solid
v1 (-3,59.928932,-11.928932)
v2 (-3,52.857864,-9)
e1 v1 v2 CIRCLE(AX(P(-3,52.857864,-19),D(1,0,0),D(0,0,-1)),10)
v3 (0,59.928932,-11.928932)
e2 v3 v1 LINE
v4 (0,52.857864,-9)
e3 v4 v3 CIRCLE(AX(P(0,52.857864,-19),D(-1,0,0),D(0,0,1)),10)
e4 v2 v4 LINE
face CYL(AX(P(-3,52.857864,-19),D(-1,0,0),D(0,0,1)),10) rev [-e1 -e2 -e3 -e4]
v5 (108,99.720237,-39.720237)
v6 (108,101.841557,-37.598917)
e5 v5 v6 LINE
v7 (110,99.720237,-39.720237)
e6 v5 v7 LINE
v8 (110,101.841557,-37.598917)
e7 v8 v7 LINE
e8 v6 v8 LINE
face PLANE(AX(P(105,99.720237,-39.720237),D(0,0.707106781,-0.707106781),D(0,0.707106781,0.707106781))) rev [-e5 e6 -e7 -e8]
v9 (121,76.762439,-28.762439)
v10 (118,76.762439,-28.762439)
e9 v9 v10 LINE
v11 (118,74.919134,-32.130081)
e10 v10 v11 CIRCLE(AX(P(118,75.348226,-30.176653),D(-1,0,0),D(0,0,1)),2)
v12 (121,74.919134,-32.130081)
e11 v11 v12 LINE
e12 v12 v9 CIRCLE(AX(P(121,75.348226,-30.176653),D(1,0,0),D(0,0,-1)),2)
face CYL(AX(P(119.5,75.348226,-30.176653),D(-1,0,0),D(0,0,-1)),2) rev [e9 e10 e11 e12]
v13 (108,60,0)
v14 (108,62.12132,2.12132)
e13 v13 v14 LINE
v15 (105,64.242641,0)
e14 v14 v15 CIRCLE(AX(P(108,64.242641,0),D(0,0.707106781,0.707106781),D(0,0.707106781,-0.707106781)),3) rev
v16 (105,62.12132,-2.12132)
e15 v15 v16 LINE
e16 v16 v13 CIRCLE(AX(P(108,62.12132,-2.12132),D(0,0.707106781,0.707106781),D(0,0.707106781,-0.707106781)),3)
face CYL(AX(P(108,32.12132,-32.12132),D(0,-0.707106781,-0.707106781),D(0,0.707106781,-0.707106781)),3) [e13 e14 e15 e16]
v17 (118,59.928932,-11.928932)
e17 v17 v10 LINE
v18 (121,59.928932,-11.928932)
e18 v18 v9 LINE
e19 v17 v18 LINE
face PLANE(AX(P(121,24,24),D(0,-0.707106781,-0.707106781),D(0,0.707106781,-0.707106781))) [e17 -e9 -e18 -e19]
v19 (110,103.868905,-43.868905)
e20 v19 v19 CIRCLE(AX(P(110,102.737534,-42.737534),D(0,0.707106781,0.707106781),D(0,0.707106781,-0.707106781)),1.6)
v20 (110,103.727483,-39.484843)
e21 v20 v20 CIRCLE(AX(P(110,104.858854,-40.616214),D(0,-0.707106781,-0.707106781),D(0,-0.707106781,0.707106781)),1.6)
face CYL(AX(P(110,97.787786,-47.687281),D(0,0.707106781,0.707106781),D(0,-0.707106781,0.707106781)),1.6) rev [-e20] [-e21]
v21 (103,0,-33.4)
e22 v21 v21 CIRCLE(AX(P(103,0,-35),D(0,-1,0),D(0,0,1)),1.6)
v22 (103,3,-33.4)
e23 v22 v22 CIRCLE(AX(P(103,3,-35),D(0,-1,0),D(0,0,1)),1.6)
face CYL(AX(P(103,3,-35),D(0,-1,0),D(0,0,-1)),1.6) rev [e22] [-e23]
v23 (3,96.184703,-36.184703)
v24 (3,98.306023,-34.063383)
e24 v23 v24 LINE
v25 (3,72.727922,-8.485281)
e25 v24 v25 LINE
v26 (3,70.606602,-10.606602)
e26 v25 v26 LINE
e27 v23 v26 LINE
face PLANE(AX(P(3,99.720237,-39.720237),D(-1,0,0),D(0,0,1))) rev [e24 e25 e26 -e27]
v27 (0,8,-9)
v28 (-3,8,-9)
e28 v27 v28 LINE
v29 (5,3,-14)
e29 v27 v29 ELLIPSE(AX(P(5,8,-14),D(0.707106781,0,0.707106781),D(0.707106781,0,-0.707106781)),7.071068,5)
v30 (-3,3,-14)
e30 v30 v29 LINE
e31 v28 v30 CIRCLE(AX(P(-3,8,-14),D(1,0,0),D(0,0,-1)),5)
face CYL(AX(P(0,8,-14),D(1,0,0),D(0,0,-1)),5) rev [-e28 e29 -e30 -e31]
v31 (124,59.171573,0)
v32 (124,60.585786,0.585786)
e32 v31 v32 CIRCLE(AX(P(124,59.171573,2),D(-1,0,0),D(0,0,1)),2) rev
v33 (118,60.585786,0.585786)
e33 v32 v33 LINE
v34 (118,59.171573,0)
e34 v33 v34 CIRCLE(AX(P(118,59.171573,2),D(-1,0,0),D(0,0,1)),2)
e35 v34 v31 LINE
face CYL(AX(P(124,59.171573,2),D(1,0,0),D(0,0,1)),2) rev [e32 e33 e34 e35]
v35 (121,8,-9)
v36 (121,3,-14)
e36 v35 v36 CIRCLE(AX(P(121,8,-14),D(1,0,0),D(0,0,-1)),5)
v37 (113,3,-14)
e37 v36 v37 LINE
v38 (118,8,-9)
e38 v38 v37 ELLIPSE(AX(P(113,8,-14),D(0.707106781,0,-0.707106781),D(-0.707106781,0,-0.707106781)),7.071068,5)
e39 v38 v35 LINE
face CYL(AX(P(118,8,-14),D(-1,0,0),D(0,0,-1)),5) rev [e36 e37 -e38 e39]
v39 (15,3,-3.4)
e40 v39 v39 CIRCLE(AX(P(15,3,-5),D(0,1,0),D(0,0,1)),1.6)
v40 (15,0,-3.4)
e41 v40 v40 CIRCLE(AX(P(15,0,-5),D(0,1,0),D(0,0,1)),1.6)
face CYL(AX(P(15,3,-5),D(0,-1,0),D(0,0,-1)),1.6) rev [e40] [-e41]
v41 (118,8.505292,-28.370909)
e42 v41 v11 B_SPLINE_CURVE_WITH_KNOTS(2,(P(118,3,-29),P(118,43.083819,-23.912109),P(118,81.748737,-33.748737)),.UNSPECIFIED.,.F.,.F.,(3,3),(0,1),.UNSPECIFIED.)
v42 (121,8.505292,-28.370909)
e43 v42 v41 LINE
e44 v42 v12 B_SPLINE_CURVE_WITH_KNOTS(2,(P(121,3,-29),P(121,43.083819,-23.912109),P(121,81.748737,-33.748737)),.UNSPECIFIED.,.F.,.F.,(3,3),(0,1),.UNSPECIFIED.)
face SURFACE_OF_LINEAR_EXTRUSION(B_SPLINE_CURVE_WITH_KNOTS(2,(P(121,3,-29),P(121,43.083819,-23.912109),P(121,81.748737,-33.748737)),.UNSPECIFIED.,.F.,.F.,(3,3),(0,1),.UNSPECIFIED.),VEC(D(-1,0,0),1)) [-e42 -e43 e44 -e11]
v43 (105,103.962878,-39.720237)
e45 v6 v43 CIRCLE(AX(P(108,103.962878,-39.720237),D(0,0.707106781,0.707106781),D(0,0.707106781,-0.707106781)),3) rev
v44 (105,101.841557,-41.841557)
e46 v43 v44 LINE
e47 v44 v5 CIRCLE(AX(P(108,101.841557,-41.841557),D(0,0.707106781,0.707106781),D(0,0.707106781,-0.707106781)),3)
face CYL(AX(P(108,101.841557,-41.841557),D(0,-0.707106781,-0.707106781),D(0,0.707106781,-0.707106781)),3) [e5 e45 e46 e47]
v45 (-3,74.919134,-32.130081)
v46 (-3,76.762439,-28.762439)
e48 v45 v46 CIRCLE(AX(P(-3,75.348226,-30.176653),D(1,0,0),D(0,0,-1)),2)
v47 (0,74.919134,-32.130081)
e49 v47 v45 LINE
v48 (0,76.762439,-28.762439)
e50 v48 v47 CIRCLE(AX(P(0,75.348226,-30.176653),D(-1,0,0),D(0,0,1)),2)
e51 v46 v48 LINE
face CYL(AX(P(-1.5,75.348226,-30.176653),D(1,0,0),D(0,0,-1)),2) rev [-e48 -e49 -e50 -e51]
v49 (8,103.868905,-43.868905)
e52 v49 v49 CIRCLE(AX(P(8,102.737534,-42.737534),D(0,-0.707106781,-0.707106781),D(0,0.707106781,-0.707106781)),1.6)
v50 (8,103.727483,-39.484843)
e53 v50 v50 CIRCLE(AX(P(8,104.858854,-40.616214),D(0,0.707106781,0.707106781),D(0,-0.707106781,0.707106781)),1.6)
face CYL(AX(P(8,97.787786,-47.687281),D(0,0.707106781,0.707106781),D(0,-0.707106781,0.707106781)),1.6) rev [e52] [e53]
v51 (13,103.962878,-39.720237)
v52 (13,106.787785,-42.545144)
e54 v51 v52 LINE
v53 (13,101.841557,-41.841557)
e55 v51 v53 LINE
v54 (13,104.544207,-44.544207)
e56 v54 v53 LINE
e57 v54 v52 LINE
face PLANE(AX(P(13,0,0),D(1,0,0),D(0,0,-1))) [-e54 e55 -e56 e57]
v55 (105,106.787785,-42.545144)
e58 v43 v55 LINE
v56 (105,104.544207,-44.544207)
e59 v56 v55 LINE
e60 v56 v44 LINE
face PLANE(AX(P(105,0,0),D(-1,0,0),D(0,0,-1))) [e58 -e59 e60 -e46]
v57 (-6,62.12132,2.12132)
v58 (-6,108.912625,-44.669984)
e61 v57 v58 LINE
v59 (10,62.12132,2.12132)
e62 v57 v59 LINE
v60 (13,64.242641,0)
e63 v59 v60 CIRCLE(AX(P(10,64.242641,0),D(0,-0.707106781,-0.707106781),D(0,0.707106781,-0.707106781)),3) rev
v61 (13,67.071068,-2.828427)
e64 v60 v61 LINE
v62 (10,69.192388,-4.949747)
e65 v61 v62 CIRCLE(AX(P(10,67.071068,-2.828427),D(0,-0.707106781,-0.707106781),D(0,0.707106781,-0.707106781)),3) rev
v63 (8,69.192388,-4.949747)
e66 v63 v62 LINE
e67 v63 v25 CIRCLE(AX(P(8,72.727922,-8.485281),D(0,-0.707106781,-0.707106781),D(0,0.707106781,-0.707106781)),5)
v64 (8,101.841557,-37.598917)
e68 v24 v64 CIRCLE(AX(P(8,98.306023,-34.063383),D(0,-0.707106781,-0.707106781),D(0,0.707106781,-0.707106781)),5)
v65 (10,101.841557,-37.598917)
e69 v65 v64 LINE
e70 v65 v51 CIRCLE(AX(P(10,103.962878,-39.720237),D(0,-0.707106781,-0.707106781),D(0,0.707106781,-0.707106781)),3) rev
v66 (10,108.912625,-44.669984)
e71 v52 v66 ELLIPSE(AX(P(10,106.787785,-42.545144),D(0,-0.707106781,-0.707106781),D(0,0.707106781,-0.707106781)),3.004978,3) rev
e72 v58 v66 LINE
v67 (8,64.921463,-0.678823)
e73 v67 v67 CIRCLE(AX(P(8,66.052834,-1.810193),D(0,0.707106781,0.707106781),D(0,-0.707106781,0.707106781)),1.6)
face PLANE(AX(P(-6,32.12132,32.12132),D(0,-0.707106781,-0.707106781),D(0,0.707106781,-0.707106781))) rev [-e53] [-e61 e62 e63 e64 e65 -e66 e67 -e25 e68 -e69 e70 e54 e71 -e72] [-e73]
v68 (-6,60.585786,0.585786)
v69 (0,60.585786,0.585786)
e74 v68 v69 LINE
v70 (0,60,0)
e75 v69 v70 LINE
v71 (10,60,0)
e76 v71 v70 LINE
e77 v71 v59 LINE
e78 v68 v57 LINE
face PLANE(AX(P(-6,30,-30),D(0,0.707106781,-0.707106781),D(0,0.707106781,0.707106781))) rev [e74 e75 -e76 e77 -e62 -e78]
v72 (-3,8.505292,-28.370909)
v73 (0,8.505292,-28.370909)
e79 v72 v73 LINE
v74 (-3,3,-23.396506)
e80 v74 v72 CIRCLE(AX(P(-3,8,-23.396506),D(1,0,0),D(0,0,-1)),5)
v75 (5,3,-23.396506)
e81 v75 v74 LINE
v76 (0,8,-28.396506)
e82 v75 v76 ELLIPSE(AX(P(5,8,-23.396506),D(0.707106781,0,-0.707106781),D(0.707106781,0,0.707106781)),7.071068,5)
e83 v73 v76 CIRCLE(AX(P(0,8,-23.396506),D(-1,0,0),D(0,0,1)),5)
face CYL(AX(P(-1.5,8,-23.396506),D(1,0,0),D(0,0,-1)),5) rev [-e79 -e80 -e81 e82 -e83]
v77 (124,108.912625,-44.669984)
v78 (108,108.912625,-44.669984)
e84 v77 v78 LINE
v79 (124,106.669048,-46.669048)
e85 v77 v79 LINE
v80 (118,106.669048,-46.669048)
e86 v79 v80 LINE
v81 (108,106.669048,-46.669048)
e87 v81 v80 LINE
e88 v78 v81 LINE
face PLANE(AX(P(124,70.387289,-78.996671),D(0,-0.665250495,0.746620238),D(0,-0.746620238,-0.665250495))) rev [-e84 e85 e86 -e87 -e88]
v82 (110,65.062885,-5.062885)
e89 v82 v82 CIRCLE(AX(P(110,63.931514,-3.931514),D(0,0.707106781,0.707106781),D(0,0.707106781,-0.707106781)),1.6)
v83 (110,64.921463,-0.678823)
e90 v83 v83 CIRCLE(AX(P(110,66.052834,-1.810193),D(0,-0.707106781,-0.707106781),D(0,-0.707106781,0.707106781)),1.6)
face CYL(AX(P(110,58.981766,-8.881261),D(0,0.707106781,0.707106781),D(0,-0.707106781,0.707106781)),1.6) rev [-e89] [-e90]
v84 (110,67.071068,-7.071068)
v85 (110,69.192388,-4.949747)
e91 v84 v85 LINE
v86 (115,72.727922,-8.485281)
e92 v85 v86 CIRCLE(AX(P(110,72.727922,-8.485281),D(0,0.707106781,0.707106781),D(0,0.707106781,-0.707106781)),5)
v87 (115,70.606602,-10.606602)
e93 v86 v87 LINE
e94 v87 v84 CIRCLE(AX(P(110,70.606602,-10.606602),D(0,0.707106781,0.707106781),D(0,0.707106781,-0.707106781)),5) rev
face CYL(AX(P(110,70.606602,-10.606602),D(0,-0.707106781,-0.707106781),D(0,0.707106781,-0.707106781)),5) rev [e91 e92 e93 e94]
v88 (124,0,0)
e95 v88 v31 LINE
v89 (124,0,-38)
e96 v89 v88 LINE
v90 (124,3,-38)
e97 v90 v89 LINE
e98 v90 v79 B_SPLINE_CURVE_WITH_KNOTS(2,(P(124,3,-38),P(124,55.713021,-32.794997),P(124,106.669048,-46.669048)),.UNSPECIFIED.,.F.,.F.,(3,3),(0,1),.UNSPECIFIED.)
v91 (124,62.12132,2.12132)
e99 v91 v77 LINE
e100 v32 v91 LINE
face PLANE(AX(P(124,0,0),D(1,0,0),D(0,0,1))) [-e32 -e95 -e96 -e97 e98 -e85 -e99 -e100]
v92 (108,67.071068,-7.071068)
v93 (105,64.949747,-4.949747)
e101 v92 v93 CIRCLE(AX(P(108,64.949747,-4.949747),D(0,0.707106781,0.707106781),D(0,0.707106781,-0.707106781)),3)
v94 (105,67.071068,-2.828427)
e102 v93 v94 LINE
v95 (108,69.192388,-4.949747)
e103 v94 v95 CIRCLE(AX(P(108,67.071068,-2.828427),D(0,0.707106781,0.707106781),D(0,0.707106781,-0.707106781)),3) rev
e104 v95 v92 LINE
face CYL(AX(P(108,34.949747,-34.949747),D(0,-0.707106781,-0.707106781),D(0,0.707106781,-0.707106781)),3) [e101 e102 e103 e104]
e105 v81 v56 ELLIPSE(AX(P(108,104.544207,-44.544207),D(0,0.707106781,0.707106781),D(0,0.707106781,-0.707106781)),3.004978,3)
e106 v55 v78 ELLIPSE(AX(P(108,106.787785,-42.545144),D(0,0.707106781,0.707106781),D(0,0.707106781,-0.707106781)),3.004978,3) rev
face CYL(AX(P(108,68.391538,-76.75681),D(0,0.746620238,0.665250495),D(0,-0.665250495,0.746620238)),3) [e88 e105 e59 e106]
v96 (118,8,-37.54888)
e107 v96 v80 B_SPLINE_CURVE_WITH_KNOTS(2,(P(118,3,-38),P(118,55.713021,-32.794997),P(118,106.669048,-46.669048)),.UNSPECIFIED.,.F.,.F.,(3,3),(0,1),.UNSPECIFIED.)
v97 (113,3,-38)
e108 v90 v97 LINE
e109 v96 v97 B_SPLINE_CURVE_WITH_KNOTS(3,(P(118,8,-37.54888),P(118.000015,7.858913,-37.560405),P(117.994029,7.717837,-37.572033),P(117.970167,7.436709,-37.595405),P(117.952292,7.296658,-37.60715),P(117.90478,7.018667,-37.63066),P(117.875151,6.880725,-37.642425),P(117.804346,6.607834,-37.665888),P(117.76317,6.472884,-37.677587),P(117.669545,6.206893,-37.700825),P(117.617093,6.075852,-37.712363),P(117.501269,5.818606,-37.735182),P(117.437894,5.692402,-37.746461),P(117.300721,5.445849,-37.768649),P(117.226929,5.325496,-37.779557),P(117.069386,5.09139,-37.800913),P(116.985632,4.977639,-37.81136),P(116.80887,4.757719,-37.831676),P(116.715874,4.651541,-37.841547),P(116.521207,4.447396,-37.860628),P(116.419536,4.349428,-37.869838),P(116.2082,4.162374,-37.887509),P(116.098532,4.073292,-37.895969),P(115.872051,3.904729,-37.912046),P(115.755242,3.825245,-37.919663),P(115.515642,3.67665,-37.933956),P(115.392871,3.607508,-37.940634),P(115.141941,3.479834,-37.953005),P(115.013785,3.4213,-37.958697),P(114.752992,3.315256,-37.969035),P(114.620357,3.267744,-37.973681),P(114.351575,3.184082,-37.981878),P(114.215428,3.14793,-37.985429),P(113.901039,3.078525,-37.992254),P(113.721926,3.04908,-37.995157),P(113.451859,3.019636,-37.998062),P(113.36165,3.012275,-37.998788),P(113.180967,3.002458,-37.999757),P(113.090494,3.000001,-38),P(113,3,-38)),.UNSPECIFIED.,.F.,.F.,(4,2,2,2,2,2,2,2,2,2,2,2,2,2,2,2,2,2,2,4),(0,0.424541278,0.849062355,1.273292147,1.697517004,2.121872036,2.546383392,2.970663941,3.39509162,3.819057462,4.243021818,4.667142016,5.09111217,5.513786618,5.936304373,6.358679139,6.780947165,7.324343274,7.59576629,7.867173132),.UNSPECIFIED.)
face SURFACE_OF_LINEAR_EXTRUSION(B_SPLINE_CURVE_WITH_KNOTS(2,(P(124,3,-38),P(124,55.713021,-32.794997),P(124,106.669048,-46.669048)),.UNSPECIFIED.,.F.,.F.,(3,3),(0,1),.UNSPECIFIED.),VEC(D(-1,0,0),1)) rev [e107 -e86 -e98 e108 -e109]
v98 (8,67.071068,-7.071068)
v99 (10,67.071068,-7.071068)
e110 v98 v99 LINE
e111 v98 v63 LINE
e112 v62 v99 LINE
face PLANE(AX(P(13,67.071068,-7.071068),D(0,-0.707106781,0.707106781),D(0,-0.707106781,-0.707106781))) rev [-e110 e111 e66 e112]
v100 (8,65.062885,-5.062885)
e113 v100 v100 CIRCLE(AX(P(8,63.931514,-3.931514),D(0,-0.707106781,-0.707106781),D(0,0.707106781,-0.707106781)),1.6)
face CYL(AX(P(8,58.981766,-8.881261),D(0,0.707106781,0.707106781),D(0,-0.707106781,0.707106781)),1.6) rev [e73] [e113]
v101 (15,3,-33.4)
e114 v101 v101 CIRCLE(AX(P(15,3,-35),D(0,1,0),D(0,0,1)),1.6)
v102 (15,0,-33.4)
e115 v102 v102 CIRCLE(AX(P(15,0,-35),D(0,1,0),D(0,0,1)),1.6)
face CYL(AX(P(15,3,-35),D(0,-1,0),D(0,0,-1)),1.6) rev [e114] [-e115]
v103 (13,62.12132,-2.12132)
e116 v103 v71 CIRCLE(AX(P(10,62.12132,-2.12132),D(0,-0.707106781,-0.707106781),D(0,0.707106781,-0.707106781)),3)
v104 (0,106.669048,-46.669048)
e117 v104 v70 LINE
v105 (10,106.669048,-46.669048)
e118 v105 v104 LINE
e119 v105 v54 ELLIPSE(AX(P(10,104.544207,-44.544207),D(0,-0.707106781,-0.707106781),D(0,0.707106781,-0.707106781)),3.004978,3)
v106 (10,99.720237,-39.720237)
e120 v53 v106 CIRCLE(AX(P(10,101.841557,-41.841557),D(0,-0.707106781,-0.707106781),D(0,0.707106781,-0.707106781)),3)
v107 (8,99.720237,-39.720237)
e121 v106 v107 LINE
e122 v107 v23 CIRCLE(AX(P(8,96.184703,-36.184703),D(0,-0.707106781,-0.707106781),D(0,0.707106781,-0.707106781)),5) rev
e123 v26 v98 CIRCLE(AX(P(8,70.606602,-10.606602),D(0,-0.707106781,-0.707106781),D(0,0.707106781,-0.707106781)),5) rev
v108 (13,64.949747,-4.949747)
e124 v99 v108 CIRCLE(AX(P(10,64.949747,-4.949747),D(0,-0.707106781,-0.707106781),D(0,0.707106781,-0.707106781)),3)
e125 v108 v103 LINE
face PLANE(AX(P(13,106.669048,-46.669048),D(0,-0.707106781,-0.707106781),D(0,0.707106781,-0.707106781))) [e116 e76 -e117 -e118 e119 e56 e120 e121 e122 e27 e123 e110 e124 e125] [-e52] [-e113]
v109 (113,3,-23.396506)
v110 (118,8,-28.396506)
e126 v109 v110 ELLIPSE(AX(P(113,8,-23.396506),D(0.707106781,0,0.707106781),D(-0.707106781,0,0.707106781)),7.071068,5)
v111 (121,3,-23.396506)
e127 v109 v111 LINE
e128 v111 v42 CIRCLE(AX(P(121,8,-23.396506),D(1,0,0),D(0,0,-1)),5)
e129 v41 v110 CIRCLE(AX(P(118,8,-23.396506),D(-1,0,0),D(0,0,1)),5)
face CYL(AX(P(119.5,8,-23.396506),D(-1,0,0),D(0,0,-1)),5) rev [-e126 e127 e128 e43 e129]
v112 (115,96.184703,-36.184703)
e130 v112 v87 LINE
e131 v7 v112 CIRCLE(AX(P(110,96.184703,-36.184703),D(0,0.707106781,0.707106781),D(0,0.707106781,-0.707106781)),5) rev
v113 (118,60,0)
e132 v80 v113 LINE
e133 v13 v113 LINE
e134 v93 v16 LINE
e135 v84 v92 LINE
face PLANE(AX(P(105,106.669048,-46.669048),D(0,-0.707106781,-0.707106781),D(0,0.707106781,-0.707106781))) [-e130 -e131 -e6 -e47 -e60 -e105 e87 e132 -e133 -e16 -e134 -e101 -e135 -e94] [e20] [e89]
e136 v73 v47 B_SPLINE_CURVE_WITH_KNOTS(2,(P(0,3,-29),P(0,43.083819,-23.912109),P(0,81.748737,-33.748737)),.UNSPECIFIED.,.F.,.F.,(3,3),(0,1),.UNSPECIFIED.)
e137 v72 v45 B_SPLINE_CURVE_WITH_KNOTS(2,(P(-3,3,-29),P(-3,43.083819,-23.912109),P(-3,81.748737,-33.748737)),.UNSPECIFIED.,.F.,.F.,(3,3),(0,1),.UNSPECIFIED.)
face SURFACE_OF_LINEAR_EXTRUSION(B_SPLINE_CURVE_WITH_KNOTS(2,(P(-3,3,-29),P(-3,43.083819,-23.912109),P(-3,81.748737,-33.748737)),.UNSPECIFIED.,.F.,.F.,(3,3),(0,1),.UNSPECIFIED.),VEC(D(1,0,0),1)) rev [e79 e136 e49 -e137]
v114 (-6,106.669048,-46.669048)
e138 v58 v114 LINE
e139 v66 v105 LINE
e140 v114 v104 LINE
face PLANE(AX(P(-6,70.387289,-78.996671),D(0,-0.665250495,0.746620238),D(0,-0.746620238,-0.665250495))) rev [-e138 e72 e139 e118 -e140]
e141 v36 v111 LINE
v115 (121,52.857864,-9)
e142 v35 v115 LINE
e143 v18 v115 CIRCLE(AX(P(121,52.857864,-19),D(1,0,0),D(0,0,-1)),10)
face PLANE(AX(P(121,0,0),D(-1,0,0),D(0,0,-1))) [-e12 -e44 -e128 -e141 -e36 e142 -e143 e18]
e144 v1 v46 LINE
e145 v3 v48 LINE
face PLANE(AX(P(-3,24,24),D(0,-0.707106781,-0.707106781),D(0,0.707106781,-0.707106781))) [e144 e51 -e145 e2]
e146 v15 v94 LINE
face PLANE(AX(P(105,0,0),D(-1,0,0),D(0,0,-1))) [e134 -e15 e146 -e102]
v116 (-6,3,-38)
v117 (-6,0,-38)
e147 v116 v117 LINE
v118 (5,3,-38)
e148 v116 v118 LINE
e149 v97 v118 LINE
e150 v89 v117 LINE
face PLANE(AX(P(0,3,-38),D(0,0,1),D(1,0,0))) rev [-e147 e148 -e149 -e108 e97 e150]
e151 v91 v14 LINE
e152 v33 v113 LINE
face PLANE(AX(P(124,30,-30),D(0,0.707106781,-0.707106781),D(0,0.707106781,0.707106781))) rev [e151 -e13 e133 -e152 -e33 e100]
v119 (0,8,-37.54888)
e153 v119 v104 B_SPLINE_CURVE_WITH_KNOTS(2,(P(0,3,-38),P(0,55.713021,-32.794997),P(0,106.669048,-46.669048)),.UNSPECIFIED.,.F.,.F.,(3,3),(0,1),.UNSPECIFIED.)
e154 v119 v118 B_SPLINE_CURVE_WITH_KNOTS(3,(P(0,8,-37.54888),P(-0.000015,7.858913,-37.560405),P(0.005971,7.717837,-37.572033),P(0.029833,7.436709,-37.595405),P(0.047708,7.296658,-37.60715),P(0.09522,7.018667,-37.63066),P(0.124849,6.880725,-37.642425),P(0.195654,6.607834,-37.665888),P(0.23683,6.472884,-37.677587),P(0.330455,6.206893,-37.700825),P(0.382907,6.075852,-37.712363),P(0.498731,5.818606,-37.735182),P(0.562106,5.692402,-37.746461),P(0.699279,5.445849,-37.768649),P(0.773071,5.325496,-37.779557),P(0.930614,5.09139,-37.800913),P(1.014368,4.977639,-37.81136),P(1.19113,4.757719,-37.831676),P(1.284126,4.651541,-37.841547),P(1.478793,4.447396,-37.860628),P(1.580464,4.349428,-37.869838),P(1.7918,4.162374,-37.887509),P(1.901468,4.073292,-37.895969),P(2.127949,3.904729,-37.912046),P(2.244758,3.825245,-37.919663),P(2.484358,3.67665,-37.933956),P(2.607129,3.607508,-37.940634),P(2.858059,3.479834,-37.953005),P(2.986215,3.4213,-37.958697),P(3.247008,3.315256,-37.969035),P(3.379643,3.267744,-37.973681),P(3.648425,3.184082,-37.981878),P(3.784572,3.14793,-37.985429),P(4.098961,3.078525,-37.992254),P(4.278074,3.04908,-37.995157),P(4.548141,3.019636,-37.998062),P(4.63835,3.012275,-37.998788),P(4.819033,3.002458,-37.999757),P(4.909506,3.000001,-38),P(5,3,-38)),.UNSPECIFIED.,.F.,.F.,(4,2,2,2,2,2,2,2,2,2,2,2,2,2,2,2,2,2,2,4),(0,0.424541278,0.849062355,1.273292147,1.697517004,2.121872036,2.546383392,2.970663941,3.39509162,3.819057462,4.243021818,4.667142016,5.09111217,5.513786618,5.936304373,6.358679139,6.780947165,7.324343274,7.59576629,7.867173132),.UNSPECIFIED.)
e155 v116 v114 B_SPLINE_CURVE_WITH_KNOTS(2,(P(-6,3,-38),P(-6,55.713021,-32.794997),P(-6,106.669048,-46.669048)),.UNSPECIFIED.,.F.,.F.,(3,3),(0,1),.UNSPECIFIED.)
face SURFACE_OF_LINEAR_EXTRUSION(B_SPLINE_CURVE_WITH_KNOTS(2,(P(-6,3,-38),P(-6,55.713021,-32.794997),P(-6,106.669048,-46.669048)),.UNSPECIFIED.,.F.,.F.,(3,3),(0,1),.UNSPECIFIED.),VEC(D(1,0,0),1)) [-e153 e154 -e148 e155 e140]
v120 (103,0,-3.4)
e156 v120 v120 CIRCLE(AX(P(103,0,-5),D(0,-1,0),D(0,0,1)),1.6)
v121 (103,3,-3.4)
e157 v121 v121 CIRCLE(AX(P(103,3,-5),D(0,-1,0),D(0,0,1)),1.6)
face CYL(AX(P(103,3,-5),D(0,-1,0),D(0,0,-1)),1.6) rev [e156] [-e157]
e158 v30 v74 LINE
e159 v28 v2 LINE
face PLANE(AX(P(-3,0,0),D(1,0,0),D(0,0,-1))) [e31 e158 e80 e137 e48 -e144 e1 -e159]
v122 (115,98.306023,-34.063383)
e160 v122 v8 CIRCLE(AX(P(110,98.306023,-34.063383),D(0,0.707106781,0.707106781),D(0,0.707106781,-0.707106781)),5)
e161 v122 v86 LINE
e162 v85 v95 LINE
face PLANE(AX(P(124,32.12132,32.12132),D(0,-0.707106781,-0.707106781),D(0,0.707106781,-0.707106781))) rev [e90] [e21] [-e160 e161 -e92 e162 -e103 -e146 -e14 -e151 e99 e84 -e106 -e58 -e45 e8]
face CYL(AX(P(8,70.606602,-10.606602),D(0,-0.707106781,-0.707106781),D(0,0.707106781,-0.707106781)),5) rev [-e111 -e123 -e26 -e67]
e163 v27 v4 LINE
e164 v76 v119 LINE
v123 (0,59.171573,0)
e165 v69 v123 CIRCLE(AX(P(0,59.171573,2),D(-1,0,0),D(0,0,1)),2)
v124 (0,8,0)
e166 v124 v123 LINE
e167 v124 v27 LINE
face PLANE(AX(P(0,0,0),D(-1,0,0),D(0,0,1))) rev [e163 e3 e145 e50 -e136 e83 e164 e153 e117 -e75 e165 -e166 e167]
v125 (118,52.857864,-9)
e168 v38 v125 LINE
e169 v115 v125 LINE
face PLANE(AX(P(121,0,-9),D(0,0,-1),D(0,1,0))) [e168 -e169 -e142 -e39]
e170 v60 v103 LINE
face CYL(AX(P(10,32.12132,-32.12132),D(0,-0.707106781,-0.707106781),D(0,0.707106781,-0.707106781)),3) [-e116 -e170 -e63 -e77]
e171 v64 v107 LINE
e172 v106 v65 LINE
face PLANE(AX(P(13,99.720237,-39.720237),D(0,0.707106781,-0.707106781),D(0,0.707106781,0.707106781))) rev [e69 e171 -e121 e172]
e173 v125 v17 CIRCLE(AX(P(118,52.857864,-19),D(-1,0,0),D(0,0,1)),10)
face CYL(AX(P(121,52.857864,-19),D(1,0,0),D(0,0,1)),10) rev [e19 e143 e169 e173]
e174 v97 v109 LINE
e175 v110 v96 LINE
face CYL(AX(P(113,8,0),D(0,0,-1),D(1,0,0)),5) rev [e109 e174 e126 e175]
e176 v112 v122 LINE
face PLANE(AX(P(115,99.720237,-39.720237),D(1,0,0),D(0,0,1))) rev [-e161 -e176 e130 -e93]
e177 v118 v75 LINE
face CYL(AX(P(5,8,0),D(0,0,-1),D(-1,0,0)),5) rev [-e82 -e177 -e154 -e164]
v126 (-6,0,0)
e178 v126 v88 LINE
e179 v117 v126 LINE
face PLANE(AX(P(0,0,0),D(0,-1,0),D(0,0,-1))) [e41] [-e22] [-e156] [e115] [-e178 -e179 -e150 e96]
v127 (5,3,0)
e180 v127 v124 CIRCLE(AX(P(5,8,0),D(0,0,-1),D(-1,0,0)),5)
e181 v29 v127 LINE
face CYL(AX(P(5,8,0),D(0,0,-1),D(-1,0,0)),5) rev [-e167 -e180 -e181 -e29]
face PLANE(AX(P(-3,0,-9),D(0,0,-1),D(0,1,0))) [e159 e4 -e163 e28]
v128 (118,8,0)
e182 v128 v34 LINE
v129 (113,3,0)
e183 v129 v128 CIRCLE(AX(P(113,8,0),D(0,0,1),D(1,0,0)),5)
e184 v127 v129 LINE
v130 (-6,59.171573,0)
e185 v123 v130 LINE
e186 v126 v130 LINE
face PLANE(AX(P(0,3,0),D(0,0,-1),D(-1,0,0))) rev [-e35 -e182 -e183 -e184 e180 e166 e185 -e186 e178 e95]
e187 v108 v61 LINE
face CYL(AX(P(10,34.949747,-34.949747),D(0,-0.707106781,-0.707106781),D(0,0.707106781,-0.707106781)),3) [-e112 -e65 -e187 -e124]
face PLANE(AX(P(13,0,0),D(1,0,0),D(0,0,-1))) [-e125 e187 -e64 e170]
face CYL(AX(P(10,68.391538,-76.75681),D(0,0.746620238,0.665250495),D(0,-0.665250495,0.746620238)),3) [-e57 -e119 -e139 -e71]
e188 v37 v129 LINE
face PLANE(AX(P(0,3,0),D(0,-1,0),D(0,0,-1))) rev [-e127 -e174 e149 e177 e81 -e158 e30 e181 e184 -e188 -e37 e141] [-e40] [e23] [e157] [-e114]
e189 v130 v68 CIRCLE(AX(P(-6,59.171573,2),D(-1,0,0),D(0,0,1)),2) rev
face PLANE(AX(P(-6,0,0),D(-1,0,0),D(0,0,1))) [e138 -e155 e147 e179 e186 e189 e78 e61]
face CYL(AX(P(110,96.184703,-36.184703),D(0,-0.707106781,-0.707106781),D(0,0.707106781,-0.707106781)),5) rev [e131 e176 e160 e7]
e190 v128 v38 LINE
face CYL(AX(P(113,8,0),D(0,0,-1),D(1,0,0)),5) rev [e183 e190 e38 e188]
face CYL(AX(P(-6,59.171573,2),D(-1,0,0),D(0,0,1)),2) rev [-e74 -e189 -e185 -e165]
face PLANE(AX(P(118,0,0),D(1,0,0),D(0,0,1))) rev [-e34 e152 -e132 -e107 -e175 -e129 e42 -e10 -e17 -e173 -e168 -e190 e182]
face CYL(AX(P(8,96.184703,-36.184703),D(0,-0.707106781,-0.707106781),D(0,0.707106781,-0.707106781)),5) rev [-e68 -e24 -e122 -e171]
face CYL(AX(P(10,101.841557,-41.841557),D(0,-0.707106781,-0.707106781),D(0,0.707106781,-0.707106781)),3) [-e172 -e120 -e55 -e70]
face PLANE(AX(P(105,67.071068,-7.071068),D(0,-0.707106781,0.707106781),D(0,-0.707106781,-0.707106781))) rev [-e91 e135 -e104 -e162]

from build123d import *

# Parameters (mm, degrees)
SKETCH_1_W          = 20
SKETCH_1_H          = 38
SKETCH_1_R          = 1.6
EXTRUDE_1_DEPTH     = 3
SKETCH_7_W          = 38
SKETCH_7_H          = 3
EXTRUDE_7_DEPTH     = 6
EXTRUDE_8_DEPTH     = 19
FILLET_1_R          = 2
SKETCH_10_R         = 1.6
CUT_EXTRUDE_3_DEPTH = 10
CUT_EXTRUDE_4_DEPTH = 3
SKETCH_13_W         = 10
SKETCH_13_H         = 46.172897719
CUT_EXTRUDE_5_DEPTH = 3
FILLET_3_R          = 10
FILLET_4_R          = 5
FILLET_5_R          = 2
FILLET_6_R          = 5
FILLET_7_R          = 5
FILLET_8_R          = 3
SKETCH_11_W         = 39
SKETCH_11_H         = 38
EXTRUDE_9_DEPTH     = 3
FILLET_START        = -37.531780157
FILLET_9_DEPTH      = 9.135274029
FILLET_START_2      = -9
FILLET_9_2_DEPTH    = 9
FILLET_START_3      = -38.0000001
FILLET_9_3_DEPTH    = 14.603493972
FILLET_START_4      = -14
FILLET_9_4_DEPTH    = 5
FILLET_9_5_DEPTH    = 5


with BuildPart() as part:
    # 草图1 → 凸台-拉伸1 (new body)
    with BuildSketch(Plane(origin=(0, 0, 0), x_dir=(1, 0, 0), z_dir=(0, 1, 0))):
        with Locations((10, 19)):
            Rectangle(SKETCH_1_W, SKETCH_1_H)
        with Locations(Location((15, 5, 0), (0, 0, 270))):
            Circle(SKETCH_1_R, mode=Mode.SUBTRACT)
        with Locations(Location((15, 35, 0), (0, 0, 270))):
            Circle(SKETCH_1_R, mode=Mode.SUBTRACT)
    extrude(amount=EXTRUDE_1_DEPTH)

    # 草图7 → 凸台-拉伸7 (add)
    with BuildSketch(Plane.ZY):
        with BuildLine():
            Line((-38, 3), (0, 3))
            Line((0, 3), (0, 60))
            Line((0, 60), (-38, 60))
            add(Edge.make_bspline(
                [(-38, 3), (-35.160021148, 31.761534368), (-38, 60)],
                knots=[0, 0, 0, 0.545624852, 0.545624852, 0.545624852], degree=2))
        make_face()
        with Locations((-19, 1.5)):
            Rectangle(SKETCH_7_W, SKETCH_7_H)
        with BuildLine():
            Line((-38, 60), (0, 60))
            Line((0, 60), (2.121320344, 62.121320344))
            Line((2.121320344, 62.121320344), (-44.669984364, 108.912625051))
            Line((-44.669984364, 108.912625051), (-46.669047558, 106.669047558))
            add(Edge.make_bspline(
                [(-38, 60), (-40.365023894, 83.51589552), (-46.669047558, 106.669047558)],
                knots=[0.545624852, 0.545624852, 0.545624852, 1, 1, 1], degree=2))
        make_face()
    extrude(amount=EXTRUDE_7_DEPTH)

    # 草图8 → 凸台-拉伸8 (add)
    with BuildSketch(Plane.ZY.offset(6)):
        Polygon((-44.669984364, 108.912625051), (-46.669047558, 106.669047558), (0, 60), (2.121320344, 62.121320344), align=None)
    extrude(amount=-EXTRUDE_8_DEPTH)

    # 圆角1
    fillet_1_edges = [part.edges().sort_by_distance(p)[0] for p in [
        (-3, 60, 0),
    ]]
    fillet(fillet_1_edges, radius=FILLET_1_R)

    # 草图10 → 切除-拉伸3 (cut)
    with BuildSketch(Plane(origin=(0, 32.121320344, 32.121320344), x_dir=(1, 0, 0), z_dir=(0, 0.7071067811865476, 0.7071067811865475))):
        with Locations(Location((8, 102.866406871, 0), (0, 0, 270))):
            Circle(SKETCH_10_R)
        with Locations(Location((8, 47.986406871, 0), (0, 0, 270))):
            Circle(SKETCH_10_R)
    extrude(amount=-CUT_EXTRUDE_3_DEPTH, mode=Mode.SUBTRACT)

    # 草图12 → 切除-拉伸4 (cut)
    with BuildSketch(Plane(origin=(0, 0, 0), x_dir=(0, 0, -1), z_dir=(1, 0, 0))):
        with BuildLine():
            Line((9, 57), (9, 3))
            Line((9, 3), (29, 3))
            add(Edge.make_bspline(
                [(29, 3), (25.530992691, 30.329804849), (29, 57)],
                knots=[0, 0, 0, 0.681816387, 0.681816387, 0.681816387], degree=2))
            Line((29, 57), (9, 57))
        make_face()
        with BuildLine():
            Line((33.748737342, 81.748737342), (9, 57))
            Line((9, 57), (29, 57))
            add(Edge.make_bspline(
                [(29, 57), (30.618883469, 69.446194026), (33.748737342, 81.748737342)],
                knots=[0.681816387, 0.681816387, 0.681816387, 1, 1, 1], degree=2))
        make_face()
    extrude(amount=-CUT_EXTRUDE_4_DEPTH, mode=Mode.SUBTRACT)

    # 草图13 → 切除-拉伸5 (cut)
    with BuildSketch(Plane(origin=(0, 32.121320344, 32.121320344), x_dir=(1, 0, 0), z_dir=(0, 0.7071067811865476, 0.7071067811865475))):
        with Locations((8, 75.512855731)):
            Rectangle(SKETCH_13_W, SKETCH_13_H)
    extrude(amount=-CUT_EXTRUDE_5_DEPTH, mode=Mode.SUBTRACT)

    # 圆角3
    fillet_3_edges = [part.edges().sort_by_distance(p)[0] for p in [
        (-1.5, 57, -9),
    ]]
    fillet(fillet_3_edges, radius=FILLET_3_R)

    # 圆角4
    fillet_4_edges = [part.edges().sort_by_distance(p)[0] for p in [
        (-1.5, 3, -29),
        (-1.5, 3, -9),
    ]]
    fillet(fillet_4_edges, radius=FILLET_4_R)

    # 圆角5
    fillet_5_edges = [part.edges().sort_by_distance(p)[0] for p in [
        (-1.5, 81.748737342, -33.748737342),
    ]]
    fillet(fillet_5_edges, radius=FILLET_5_R)

    # 圆角6
    fillet_6_edges = [part.edges().sort_by_distance(p)[0] for p in [
        (3, 100.780897067, -38.659576724),
    ]]
    fillet(fillet_6_edges, radius=FILLET_6_R)

    # 圆角7
    fillet_7_edges = [part.edges().sort_by_distance(p)[0] for p in [
        (3, 68.131727984, -6.01040764),
    ]]
    fillet(fillet_7_edges, radius=FILLET_7_R)

    # 圆角8
    fillet_8_edges = [part.edges().sort_by_distance(p)[0] for p in [
        (13, 61.060660172, 1.060660172),
        (13, 107.790836305, -45.669515961),
        (13, 100.780897067, -38.659576724),
        (13, 68.131727984, -6.01040764),
    ]]
    fillet(fillet_8_edges, radius=FILLET_8_R)

    # 草图11 → 凸台-拉伸9 (add)
    with BuildSketch(Plane(origin=(0, 0, 0), x_dir=(1, 0, 0), z_dir=(0, 1, 0))):
        with Locations((39.5, 19)):
            Rectangle(SKETCH_11_W, SKETCH_11_H)
    extrude(amount=EXTRUDE_9_DEPTH)

    # 圆角9: read off the stored shape, not the designer's step
    # 圆角9 outline → 圆角9 (add)
    with BuildSketch(Plane.XY.offset(FILLET_START)):
        with BuildLine():
            Line((0, 3), (5, 3))
            ThreePointArc((5, 3), (1.464466094, 4.464466094), (0, 8))
            Line((0, 8), (0, 3))
        make_face()
    extrude(amount=FILLET_9_DEPTH)

    # Fillet 9 2 outline → Fillet 9 2 (add)
    with BuildSketch(Plane.XY.offset(FILLET_START_2)):
        with BuildLine():
            Line((0, 3), (5, 3))
            ThreePointArc((5, 3), (1.464466094, 4.464466094), (0, 8))
            Line((0, 8), (0, 3))
        make_face()
    extrude(amount=FILLET_9_2_DEPTH)

    # Fillet 9 3 outline → Fillet 9 3 (add)
    with BuildSketch(Plane.XY.offset(FILLET_START_3)):
        with BuildLine():
            Line((0, 3), (5, 3))
            ThreePointArc((5, 3), (1.464466094, 4.464466094), (0, 8))
            Line((0, 8), (0, 3))
        make_face()
    extrude(amount=FILLET_9_3_DEPTH)

    # Fillet 9 4 outline → Fillet 9 4 (add)
    with BuildSketch(Plane.XY.offset(FILLET_START_4)):
        with BuildLine():
            Line((0, 3), (5, 3))
            ThreePointArc((5, 3), (1.464466094, 4.464466094), (0, 8))
            Line((0, 8), (0, 3))
        make_face()
    extrude(amount=FILLET_9_4_DEPTH)

    # Fillet 9 5 outline → Fillet 9 5 (cut)
    with BuildSketch(Plane.YZ):
        with BuildLine():
            Line((3, -14), (8, -14))
            Line((8, -14), (8, -9))
            ThreePointArc((8, -9), (4.464466094, -10.464466094), (3, -14))
        make_face()
        with BuildLine():
            Line((8, -38.0000001), (8, -37.548880036))
            add(Edge.make_bspline(
                [(3, -38), (5.50197912, -37.752948932), (8, -37.548880036)],
                knots=[0, 0, 0, 0.047464157, 0.047464157, 0.047464157], degree=2))
            Line((3, -38), (8, -38.0000001))
        make_face()
        with BuildLine():
            ThreePointArc((3, -23.396506128), (4.464466094, -26.932040034), (8, -28.396506128))
            Line((8, -28.396506128), (8, -23.396506128))
            Line((8, -23.396506128), (3, -23.396506128))
        make_face()
    extrude(amount=FILLET_9_5_DEPTH, mode=Mode.SUBTRACT)

    # 镜向6: part across plane


with BuildPart() as part_1:
    add(part.part)
    add(part.part.mirror(Plane(origin=(59, 0, 0), x_dir=(0, 0, 1), z_dir=(1, 0, 0))))


solid = part_1.part
